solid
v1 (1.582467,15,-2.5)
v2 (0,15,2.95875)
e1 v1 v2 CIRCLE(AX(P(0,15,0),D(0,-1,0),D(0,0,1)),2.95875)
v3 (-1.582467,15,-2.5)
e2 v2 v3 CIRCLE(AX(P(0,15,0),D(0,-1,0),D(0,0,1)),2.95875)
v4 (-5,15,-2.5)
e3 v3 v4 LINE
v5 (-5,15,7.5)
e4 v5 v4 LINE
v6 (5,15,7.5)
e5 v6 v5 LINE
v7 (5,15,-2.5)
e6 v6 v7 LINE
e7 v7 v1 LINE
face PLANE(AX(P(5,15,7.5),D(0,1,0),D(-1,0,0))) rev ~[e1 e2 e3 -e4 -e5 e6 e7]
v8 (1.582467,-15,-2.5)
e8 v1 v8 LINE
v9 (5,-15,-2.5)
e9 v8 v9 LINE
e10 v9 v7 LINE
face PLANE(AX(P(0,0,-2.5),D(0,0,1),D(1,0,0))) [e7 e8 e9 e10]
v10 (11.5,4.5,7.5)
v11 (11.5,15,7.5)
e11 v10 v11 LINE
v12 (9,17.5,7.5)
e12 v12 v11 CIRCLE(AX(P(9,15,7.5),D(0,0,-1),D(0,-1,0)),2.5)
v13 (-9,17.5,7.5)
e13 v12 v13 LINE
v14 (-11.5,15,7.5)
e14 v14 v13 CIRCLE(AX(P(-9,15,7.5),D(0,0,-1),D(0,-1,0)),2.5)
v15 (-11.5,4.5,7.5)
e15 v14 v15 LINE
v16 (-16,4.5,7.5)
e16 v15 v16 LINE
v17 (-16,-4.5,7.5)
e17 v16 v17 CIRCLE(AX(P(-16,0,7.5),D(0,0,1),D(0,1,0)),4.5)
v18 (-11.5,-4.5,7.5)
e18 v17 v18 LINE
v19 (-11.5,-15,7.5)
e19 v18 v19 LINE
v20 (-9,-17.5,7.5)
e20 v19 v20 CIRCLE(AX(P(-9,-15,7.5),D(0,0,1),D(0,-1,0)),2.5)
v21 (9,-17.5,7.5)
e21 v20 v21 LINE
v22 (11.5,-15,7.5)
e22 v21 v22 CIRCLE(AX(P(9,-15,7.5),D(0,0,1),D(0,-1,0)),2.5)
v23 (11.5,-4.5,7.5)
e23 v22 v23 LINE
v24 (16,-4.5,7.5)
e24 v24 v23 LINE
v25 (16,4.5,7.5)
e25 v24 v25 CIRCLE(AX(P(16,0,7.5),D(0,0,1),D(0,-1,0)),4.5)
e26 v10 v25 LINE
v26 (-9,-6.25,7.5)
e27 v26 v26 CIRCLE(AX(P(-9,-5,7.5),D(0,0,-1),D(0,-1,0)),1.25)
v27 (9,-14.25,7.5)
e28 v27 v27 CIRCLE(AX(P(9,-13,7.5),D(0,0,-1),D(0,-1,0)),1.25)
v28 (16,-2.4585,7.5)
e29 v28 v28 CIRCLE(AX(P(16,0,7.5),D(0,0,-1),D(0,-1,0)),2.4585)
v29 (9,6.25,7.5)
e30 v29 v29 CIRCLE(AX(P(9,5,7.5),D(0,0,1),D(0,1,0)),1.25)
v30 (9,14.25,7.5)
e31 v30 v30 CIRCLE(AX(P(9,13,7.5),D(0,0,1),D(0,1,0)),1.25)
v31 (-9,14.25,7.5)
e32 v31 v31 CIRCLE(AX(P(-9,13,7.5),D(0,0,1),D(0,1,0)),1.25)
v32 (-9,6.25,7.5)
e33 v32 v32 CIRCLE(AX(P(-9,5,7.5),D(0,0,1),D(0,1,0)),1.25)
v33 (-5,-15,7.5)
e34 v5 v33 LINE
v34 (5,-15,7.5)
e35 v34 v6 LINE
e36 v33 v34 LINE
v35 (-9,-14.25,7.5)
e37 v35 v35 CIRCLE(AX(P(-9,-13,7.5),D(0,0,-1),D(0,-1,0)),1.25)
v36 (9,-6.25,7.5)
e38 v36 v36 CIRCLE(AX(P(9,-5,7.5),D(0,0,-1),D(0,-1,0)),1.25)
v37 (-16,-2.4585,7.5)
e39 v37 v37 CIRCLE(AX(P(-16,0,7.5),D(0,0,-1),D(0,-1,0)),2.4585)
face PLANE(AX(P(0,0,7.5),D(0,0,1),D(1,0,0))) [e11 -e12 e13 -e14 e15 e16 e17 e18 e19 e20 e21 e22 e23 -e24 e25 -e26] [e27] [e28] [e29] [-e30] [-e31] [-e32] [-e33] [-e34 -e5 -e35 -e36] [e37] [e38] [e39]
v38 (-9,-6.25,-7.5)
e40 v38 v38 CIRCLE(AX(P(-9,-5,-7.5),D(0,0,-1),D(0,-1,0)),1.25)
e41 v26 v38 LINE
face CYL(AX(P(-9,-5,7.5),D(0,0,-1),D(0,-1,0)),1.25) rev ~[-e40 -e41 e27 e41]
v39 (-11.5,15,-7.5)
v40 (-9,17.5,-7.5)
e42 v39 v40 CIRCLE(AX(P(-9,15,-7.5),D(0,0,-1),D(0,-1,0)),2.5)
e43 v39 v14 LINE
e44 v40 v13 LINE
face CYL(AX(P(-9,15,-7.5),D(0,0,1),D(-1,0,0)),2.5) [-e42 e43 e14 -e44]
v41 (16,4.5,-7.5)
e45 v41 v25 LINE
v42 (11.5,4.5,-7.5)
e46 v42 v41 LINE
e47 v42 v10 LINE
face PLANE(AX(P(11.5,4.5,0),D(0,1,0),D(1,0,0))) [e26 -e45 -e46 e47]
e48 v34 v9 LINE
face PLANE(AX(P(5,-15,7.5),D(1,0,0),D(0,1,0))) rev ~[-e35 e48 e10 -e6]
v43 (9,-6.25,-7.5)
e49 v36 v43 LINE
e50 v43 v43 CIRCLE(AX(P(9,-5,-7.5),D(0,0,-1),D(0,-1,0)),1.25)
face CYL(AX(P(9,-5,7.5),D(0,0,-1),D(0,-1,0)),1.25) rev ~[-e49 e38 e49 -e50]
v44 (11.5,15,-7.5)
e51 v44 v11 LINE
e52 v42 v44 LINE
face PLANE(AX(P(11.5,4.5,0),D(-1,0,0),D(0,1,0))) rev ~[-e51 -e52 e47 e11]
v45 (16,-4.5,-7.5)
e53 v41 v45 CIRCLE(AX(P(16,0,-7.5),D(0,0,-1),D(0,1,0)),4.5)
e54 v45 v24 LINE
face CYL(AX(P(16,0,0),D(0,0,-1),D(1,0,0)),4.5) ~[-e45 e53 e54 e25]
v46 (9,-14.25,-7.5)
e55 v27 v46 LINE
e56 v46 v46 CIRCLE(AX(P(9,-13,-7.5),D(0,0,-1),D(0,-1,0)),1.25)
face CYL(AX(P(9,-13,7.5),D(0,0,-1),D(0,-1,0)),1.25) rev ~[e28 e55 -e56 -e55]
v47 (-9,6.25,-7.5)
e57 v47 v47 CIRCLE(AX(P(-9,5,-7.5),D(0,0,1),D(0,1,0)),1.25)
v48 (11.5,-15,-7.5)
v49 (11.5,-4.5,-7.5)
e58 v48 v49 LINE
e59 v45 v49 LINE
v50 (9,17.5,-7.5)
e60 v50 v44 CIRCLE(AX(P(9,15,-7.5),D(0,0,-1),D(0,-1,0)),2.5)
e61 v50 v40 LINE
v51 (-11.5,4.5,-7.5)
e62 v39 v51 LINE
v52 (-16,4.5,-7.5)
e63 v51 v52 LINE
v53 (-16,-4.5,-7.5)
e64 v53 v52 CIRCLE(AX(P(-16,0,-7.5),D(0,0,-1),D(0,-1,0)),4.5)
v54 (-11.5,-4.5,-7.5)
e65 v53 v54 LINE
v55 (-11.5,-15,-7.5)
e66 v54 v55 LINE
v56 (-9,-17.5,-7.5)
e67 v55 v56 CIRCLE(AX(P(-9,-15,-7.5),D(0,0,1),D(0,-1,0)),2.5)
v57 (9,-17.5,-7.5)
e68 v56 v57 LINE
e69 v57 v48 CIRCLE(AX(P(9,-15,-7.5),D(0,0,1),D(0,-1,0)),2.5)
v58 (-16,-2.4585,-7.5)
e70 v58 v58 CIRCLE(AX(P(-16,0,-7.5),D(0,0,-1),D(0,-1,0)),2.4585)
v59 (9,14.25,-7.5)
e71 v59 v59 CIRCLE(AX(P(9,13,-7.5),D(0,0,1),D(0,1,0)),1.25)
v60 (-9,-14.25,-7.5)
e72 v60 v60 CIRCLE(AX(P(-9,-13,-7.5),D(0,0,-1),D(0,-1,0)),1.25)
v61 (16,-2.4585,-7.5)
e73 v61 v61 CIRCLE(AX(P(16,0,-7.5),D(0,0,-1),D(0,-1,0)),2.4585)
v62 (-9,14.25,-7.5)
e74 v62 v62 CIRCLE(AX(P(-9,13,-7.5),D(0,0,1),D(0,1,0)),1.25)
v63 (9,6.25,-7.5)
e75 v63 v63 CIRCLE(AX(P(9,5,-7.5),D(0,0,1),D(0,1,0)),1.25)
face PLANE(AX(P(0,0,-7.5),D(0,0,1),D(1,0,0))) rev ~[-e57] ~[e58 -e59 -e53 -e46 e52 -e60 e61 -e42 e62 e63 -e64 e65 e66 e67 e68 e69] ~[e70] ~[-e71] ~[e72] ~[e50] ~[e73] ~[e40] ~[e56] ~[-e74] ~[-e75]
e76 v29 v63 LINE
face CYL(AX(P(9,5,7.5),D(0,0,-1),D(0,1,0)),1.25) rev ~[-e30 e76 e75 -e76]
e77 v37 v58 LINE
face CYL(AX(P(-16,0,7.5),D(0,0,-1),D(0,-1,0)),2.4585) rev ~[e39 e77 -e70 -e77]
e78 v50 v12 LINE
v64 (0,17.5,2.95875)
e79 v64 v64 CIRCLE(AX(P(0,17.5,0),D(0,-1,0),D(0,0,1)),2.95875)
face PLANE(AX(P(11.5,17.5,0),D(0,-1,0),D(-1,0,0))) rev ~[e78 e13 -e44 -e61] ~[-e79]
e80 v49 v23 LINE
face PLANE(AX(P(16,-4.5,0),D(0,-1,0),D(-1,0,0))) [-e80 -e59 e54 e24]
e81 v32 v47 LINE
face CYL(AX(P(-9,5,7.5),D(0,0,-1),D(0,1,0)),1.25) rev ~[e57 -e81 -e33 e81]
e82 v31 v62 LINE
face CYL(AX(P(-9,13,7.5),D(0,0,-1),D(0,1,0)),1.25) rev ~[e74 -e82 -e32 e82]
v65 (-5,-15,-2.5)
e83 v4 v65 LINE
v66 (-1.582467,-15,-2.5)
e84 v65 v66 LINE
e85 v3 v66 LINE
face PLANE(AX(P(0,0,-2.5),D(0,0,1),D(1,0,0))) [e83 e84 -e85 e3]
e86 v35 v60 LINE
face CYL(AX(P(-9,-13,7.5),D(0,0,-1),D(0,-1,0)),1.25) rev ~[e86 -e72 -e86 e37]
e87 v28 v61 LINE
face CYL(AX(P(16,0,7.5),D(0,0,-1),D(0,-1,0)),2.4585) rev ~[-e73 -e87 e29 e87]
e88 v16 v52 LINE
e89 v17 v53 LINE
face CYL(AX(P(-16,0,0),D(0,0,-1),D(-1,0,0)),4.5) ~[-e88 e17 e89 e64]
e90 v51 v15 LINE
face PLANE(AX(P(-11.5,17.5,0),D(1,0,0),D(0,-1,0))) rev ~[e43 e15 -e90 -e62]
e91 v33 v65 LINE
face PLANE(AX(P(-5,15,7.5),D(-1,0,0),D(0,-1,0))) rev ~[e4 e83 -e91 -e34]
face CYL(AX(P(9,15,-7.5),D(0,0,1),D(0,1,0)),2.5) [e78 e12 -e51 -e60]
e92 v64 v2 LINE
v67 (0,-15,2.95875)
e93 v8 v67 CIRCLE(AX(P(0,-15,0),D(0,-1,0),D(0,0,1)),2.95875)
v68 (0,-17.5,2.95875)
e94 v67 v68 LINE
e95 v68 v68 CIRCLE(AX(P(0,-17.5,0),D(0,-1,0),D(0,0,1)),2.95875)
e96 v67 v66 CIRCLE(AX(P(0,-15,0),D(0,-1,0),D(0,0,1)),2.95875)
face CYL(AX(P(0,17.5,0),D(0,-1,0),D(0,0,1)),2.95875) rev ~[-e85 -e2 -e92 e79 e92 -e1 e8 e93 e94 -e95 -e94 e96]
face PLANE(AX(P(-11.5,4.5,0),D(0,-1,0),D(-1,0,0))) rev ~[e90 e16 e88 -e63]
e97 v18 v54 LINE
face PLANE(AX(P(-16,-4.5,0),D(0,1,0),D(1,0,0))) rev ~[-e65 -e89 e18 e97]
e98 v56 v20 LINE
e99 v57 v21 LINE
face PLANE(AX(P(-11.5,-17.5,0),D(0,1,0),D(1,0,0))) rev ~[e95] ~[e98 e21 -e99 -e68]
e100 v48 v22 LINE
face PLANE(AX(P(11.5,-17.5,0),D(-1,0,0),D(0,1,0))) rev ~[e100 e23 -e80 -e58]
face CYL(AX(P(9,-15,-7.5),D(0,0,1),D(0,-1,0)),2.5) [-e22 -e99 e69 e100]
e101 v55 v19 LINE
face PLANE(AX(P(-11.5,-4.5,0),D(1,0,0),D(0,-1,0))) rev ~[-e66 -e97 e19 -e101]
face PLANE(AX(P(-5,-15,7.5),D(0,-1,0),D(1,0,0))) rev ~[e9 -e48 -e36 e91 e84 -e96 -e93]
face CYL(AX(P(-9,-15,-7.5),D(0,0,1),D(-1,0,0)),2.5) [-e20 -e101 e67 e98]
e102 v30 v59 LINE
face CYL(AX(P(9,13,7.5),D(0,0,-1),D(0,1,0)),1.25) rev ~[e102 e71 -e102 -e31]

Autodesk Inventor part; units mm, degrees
ref_plane "YZ Plane" through (0, 0, 0) normal (1, 0, 0) x (0, 1, 0)
ref_plane "XZ Plane" through (0, 0, 0) normal (0, 1, 0) x (-1, 0, 0)
ref_plane "XY Plane" through (0, 0, 0) normal (0, 0, 1) x (1, 0, 0)
sketch "Sketch1" plane through (0, 0, 0) normal (0, 0, 1) x (1, 0, 0)
  line L0 (-11.5, -17.5) -> (11.5, -17.5)
  line L1 (11.5, -17.5) -> (11.5, 17.5)
  line L2 (11.5, 17.5) -> (-11.5, 17.5)
  line L3 (-11.5, 17.5) -> (-11.5, -17.5)
  line L4 (-11.5, -17.5) -> (11.5, 17.5) construction
  line L5 (11.5, -17.5) -> (-11.5, 17.5) construction
  line L6 (-11.5, 4.5) -> (-16, 4.5)
  line L7 (-20.5, 0) -> (-20.5, 0)
  line L8 (-16, -4.5) -> (-11.5, -4.5)
  line L9 (11.5, 4.5) -> (16, 4.5)
  line L10 (20.5, 0) -> (20.5, 0)
  line L11 (16, -4.5) -> (11.5, -4.5)
  arc A0 (16, -4.5) -> (20.5, 0) centre (16, 0) ccw
  arc A1 (20.5, 0) -> (16, 4.5) centre (16, 0) ccw
  arc A2 (-20.5, 0) -> (-16, -4.5) centre (-16, 0) ccw
  arc A3 (-16, 4.5) -> (-20.5, 0) centre (-16, 0) ccw
  point P0 (0, 0)
  point P1 (-20.5, 0)
  point P2 (-11.5, 0)
  point P3 (20.5, 0)
  point P4 (11.5, 0)
  point P5 (13.75, -4.5)
  point P6 (0, -17.5)
  point P7 (20.5, 0)
  dimension "d0" = 35
  dimension "d1" = 23
  dimension "d2" = 4.5
  dimension "d3" = 9
  dimension "d4" = 4.5
  dimension "d5" = 9
  dimension "d6" = 32
  dimension "d7" = 16
extrude "Extrusion1" add sketch "Sketch1" along normal mid plane 15
sketch "Sketch2" plane through (0, 0, 7.5) normal (0, 0, 1) x (1, 0, 0)
  arc A0 (-16, 4.5) -> (-16, -4.5) centre (-16, 0) ccw projected
  arc A1 (16, -4.5) -> (16, 4.5) centre (16, 0) ccw projected
  point P0 (0, 0)
  point P1 (-16, 0)
  point P2 (16, 0)
hole "Hole1" at (-16, 0, 7.5) at (16, 0, 7.5) direction (0, 0, -1) diameter 4.917 depth 15 thread size "M6x1" class "6H" standard "ISO Metric profile"
sketch "Sketch4" plane through (-11.5, 17.5, 7.5) normal (0, 1, 0) x (1, 0, 0)
  point P0 (11.5, 7.5)
  point P1 (11.5, 7.5)
hole "Hole2" at (0, 17.5, 0) direction (0, -1, 0) diameter 5.9175 end through all thread size "M7x1" class "6H" standard "ISO Metric profile"
sketch "Sketch3" plane through (0, 0, 7.5) normal (0, 0, 1) x (1, 0, 0)
  line L0 (-5, -15) -> (5, -15)
  line L1 (5, -15) -> (5, 15)
  line L2 (5, 15) -> (-5, 15)
  line L3 (-5, 15) -> (-5, -15)
  line L4 (-5, -15) -> (5, 15) construction
  line L5 (5, -15) -> (-5, 15) construction
  point P0 (0, 0)
  dimension "d17" = 10
  dimension "d18" = 30
extrude "Extrusion2" cut sketch "Sketch3" against normal blind 10
sketch "Sketch6" plane through (0, 0, 7.5) normal (0, 0, 1) x (1, 0, 0)
  line L0 (-11.5, -17.5) -> (11.5, -17.5) projected
  point P0 (0, 0)
  point P1 (-9, -13)
  point P2 (-9, -5)
  point P3 (9, -5)
  point P4 (9, -13)
  dimension "d31" = 8
  dimension "d42" = 5
  dimension "d43" = 18
  dimension "d44" = 9
hole "Hole3" at (-9, -13, 7.5) at (-9, -5, 7.5) at (9, -5, 7.5) at (9, -13, 7.5) direction (0, 0, -1) diameter 2.5 depth 15
mirror "Mirror1" about plane through (0, 0, 0) normal (0, 1, 0) of "Hole3"
fillet "Fillet1" radius 2.5 6 edges at (11.5, 17.5, 3.75) (11.5, 17.5, -3.75) (-11.5, 17.5, 3.75) (-11.5, 17.5, -3.75) (-11.5, -17.5, 0) (11.5, -17.5, 0)
equation "\"d5\" = d3"
equation "\"d7\" = 0.5 * d6"
properties part number "15"
